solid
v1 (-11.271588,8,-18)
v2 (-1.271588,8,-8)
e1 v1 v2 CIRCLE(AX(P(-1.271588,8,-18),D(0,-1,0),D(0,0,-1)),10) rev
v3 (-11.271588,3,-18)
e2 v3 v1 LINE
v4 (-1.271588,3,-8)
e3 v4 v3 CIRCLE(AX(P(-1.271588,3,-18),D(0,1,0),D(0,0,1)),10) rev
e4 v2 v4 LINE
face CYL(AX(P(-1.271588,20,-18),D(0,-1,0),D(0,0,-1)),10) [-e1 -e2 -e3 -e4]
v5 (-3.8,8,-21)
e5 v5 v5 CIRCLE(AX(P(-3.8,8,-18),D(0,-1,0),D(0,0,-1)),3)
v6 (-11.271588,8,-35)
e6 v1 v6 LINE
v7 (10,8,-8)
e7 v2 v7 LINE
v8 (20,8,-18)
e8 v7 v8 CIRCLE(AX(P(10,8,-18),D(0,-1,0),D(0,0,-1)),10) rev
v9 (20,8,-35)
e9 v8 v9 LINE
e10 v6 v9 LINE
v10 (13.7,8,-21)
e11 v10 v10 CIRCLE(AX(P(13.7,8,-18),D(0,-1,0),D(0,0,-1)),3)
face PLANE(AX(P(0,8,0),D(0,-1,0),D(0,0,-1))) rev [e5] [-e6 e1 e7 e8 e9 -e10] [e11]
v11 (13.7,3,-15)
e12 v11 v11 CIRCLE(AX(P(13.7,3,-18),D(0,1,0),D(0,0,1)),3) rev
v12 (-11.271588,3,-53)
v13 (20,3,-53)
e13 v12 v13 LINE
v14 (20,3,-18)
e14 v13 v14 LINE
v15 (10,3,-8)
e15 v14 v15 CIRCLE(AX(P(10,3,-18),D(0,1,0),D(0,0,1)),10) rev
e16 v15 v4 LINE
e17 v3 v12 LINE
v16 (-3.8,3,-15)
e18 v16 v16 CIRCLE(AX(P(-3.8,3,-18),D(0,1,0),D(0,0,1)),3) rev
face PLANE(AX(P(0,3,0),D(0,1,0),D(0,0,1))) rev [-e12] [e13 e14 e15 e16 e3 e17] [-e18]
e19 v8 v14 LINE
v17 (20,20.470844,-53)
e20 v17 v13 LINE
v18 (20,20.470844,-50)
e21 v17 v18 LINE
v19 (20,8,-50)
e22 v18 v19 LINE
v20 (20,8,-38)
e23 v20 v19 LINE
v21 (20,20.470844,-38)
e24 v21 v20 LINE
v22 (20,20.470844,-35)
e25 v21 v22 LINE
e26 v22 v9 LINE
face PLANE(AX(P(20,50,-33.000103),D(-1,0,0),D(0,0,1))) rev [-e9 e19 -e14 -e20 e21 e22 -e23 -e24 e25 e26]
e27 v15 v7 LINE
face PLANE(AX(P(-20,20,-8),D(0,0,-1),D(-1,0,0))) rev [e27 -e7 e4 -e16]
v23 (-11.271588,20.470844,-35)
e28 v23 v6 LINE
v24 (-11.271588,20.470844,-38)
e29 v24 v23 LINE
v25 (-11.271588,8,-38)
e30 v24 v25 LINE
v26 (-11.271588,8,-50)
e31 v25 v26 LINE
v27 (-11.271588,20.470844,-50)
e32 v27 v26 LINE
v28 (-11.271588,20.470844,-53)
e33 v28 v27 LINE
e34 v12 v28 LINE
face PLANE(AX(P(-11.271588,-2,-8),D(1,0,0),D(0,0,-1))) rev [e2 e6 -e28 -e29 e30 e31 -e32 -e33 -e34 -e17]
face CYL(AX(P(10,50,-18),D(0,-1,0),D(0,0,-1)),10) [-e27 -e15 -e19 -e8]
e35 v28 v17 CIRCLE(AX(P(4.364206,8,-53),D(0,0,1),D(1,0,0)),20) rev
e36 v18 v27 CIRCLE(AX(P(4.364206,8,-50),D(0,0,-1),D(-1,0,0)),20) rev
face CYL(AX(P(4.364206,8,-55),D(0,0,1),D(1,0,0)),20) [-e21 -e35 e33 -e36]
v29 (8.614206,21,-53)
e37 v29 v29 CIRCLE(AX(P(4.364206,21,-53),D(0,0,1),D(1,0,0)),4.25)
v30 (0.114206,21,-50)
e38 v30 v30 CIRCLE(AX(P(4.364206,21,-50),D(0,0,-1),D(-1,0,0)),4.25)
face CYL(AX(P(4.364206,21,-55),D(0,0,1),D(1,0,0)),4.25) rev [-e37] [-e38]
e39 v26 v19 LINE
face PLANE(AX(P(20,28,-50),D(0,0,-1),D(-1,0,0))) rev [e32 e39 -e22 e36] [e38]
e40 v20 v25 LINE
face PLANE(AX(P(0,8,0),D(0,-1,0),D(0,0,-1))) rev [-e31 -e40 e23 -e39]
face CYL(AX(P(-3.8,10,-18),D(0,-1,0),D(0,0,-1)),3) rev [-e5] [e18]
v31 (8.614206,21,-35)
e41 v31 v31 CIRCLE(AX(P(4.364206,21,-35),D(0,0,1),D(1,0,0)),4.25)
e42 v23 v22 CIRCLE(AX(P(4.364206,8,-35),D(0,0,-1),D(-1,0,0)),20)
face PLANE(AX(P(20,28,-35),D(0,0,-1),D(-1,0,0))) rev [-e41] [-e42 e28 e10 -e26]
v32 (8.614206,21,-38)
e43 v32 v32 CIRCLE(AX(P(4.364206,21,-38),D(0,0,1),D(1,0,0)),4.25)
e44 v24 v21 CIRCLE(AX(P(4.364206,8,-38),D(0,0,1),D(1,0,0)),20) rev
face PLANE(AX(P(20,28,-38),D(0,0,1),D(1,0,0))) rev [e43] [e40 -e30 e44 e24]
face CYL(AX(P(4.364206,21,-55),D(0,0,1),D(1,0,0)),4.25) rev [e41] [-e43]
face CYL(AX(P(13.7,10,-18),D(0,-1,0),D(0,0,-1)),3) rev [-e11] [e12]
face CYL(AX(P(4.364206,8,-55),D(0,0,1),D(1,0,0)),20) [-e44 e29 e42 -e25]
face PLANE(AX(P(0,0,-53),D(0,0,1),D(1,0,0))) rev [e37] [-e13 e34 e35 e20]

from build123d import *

# Parameters (mm, degrees)
BOSS_EXTRUDE1_OUTLINE_R     = 3.500000003
BOSS_EXTRUDE1_OUTLINE_R_2   = 3.500000005
BOSS_EXTRUDE1_DEPTH         = 8
BOSS_EXTRUDE1_START         = 8
BOSS_EXTRUDE1_2_DEPTH       = 13
BOSS_EXTRUDE1_START_2       = 20.176470589
BOSS_EXTRUDE1_3_OUTLINE_W   = 15
BOSS_EXTRUDE1_3_OUTLINE_H   = 8
BOSS_EXTRUDE1_3_DEPTH       = 29.823529411
BOSS_EXTRUDE1_4_DEPTH       = 14.823529411
BOSS_EXTRUDE1_5_OUTLINE_R   = 1.75
BOSS_EXTRUDE1_5_OUTLINE_R_2 = 3.500000003
BOSS_EXTRUDE1_5_OUTLINE_R_3 = 1.749999996
BOSS_EXTRUDE1_5_OUTLINE_R_4 = 3.500000005
BOSS_EXTRUDE1_5_OUTLINE_R_5 = 1.749999999
BOSS_EXTRUDE1_5_DEPTH       = 4
BOSS_EXTRUDE1_START_3       = -34
BOSS_EXTRUDE1_6_OUTLINE_R   = 1.749999996
BOSS_EXTRUDE1_6_DEPTH       = 9
BOSS_EXTRUDE1_START_4       = 2.590816236
BOSS_EXTRUDE1_7_DEPTH       = 13.213162803
SKETCH2_W                   = 49.146856184
SKETCH2_H                   = 24.85114674
CUT_EXTRUDE1_DEPTH          = 20
SKETCH4_R                   = 5.607924621
SKETCH4_R_2                 = 5.608756875
BOSS_EXTRUDE2_DEPTH         = 8
SKETCH5_W                   = 3
SKETCH5_H                   = 8
BOSS_EXTRUDE3_DEPTH         = 17
SKETCH6_R                   = 3.5
CUT_EXTRUDE2_DEPTH          = 25
CUT_EXTRUDE3_DEPTH          = 59.429444632
CUT_EXTRUDE3_DEPTH_BACK     = 59.429444632
SKETCH7_W                   = 9.630467125
SKETCH7_H                   = 58.787662196
SKETCH8_W                   = 43
SKETCH8_H                   = 25
BOSS_EXTRUDE4_DEPTH         = 8
SKETCH9_W                   = 43
SKETCH9_H                   = 25
CUT_EXTRUDE6_DEPTH          = 11
SKETCH10_R                  = 3
CUT_EXTRUDE7_DEPTH          = 10
SKETCH11_W                  = 44.092215153
SKETCH11_H                  = 53.727113244
CUT_EXTRUDE8_DEPTH          = 10
SKETCH13_W                  = 11.72841244
SKETCH13_H                  = 25
CUT_EXTRUDE9_DEPTH          = 10
SKETCH14_W                  = 31.27158756
SKETCH14_H                  = 8
BOSS_EXTRUDE5_DEPTH         = 20
SKETCH15_W                  = 31.27158756
SKETCH15_H                  = 3
BOSS_EXTRUDE6_DEPTH         = 20
SKETCH16_R                  = 4.25
CUT_EXTRUDE12_DEPTH         = 20
SKETCH17_W                  = 31.27158756
SKETCH17_H                  = 45
CUT_EXTRUDE13_DEPTH         = 3
FILLET1_R                   = 10


with BuildPart() as part:
    # Boss-Extrude1: read off the stored shape, not the designer's step
    # Boss-Extrude1 outline → Boss-Extrude1 (new body)
    with BuildSketch(Plane(origin=(0, 0, 0), x_dir=(1, 0, 0), z_dir=(0, 1, 0))):
        with BuildLine():
            ThreePointArc((-3.5, -5), (0, -1.5), (3.5, -5))
            Line((3.5, -5), (3.5, -8))
            Line((3.5, -8), (4, -8))
            Line((4, -8), (25, 13.000000001))
            Line((25, 13.000000001), (25, 33))
            Line((25, 33), (-23, 33))
            Line((-23, 33), (-23, 25))
            Line((-23, 25), (-20, 25))
            Line((-20, 25), (-20, 8))
            Line((-20, 8), (-4, -8))
            Line((-4, -8), (-3.5, -8))
            Line((-3.5, -8), (-3.5, -5))
        make_face()
        with Locations((-10, 15)):
            Circle(BOSS_EXTRUDE1_OUTLINE_R, mode=Mode.SUBTRACT)
        with Locations((10, 15)):
            Circle(BOSS_EXTRUDE1_OUTLINE_R_2, mode=Mode.SUBTRACT)
    extrude(amount=BOSS_EXTRUDE1_DEPTH)

    # Boss-Extrude1 2 outline → Boss-Extrude1 2 (add)
    with BuildSketch(Plane(origin=(0, 0, 0), x_dir=(1, 0, 0), z_dir=(0, 1, 0)).offset(BOSS_EXTRUDE1_START)):
        Polygon((20, 25), (20, 8), (25, 13.000000001), (25, 33), (-23, 33), (-23, 25), align=None)
    extrude(amount=BOSS_EXTRUDE1_2_DEPTH)

    # Boss-Extrude1 3 outline → Boss-Extrude1 3 (add)
    with BuildSketch(Plane(origin=(0, 0, 0), x_dir=(1, 0, 0), z_dir=(0, 1, 0)).offset(BOSS_EXTRUDE1_START_2)):
        with Locations((17.5, 29)):
            Rectangle(BOSS_EXTRUDE1_3_OUTLINE_W, BOSS_EXTRUDE1_3_OUTLINE_H)
    extrude(amount=BOSS_EXTRUDE1_3_DEPTH)

    # Boss-Extrude1 4 outline → Boss-Extrude1 4 (add)
    with BuildSketch(Plane(origin=(0, 0, 0), x_dir=(1, 0, 0), z_dir=(0, 1, 0)).offset(BOSS_EXTRUDE1_START_2)):
        Polygon((20, 25), (20, 8), (25, 13.000000001), (25, 25), align=None)
    extrude(amount=BOSS_EXTRUDE1_4_DEPTH)

    # Boss-Extrude1 5 outline → Boss-Extrude1 5 (add)
    # profile 1 of 3: a face of its own
    with BuildSketch(Plane(origin=(0, 0, 0), x_dir=(1, 0, 0), z_dir=(0, 1, 0))):
        with BuildLine():
            Line((3.5, -8), (3.5, -5))
            ThreePointArc((3.5, -5), (0, -1.5), (-3.5, -5))
            Line((-3.5, -5), (-3.5, -8))
            Line((-3.5, -8), (3.5, -8))
        make_face()
        with Locations((0, -5)):
            Circle(BOSS_EXTRUDE1_5_OUTLINE_R, mode=Mode.SUBTRACT)
    # profile 2 of 3: a face of its own
    with BuildSketch(Plane(origin=(0, 0, 0), x_dir=(1, 0, 0), z_dir=(0, 1, 0))):
        with Locations((-10, 15)):
            Circle(BOSS_EXTRUDE1_5_OUTLINE_R_2)
        with Locations((-10, 15)):
            Circle(BOSS_EXTRUDE1_5_OUTLINE_R_3, mode=Mode.SUBTRACT)
    # profile 3 of 3: a face of its own
    with BuildSketch(Plane(origin=(0, 0, 0), x_dir=(1, 0, 0), z_dir=(0, 1, 0))):
        with Locations((10, 15)):
            Circle(BOSS_EXTRUDE1_5_OUTLINE_R_4)
        with Locations((10, 15)):
            Circle(BOSS_EXTRUDE1_5_OUTLINE_R_5, mode=Mode.SUBTRACT)
    extrude(amount=BOSS_EXTRUDE1_5_DEPTH)

    # Boss-Extrude1 6 outline → Boss-Extrude1 6 (cut)
    with BuildSketch(Plane.XY.offset(BOSS_EXTRUDE1_START_3)):
        with BuildLine():
            Line((-20.000000002, 18), (7, 18))
            ThreePointArc((7, 18), (9.121320344, 18.878679656), (10, 21))
            Line((10, 21), (-23, 21))
            Line((-23, 21), (-23, 15.000000003))
            Line((-23, 15.000000003), (-20.000000002, 18))
        make_face()
        Polygon((25, 50), (20, 50), (25, 42), align=None)
        Polygon((10, 50), (10, 46.999999997), (13.000000003, 49.999999997), align=None)
        with Locations((14.5, 13.5)):
            Circle(BOSS_EXTRUDE1_6_OUTLINE_R)
        with Locations((-16.5, 13.5)):
            Circle(BOSS_EXTRUDE1_6_OUTLINE_R)
        with Locations((14.5, 44.5)):
            Circle(BOSS_EXTRUDE1_6_OUTLINE_R)
    extrude(amount=BOSS_EXTRUDE1_6_DEPTH, mode=Mode.SUBTRACT)

    # Boss-Extrude1 7 outline → Boss-Extrude1 7 (cut)
    with BuildSketch(Plane(origin=(0, 0, 0), x_dir=(1, 0, 0), z_dir=(0, 0.6291982286909779, 0.7772448706888557)).offset(BOSS_EXTRUDE1_START_4)):
        Polygon((20, 15.915014019), (25, 23.861635248), (25, 42.933526191), (20, 42.933526191), align=None)
    extrude(amount=BOSS_EXTRUDE1_7_DEPTH, mode=Mode.SUBTRACT)

    # Sketch2 → Cut-Extrude1 (cut)
    with BuildSketch(Plane(origin=(0, 0, 0), x_dir=(-1, 0, 0), z_dir=(0, -1, 0))):
        with Locations((-4.573428092, -4.42557337)):
            Rectangle(SKETCH2_W, SKETCH2_H)
    extrude(amount=-CUT_EXTRUDE1_DEPTH, mode=Mode.SUBTRACT)

    # Sketch4 → Boss-Extrude2 (add, through all)
    with BuildSketch(Plane(origin=(0, 8, 0), x_dir=(1, 0, 0), z_dir=(0, 1, 0))):
        with Locations(Location((-10, 15, 0), (0, 0, 270))):
            Circle(SKETCH4_R)
        with Locations(Location((10, 15, 0), (0, 0, 270))):
            Circle(SKETCH4_R_2)
    extrude(amount=-BOSS_EXTRUDE2_DEPTH)

    # Sketch5 → Boss-Extrude3 (add)
    with BuildSketch(Plane.XY.offset(-25)):
        with Locations((-21.5, 4)):
            Rectangle(SKETCH5_W, SKETCH5_H)
    extrude(amount=BOSS_EXTRUDE3_DEPTH)

    # Sketch6 → Cut-Extrude2 (cut)
    with BuildSketch(Plane(origin=(0, 8, 0), x_dir=(1, 0, 0), z_dir=(0, 1, 0))):
        with Locations(Location((-14.7, 16.3, 0), (0, 0, 270))):
            Circle(SKETCH6_R)
        with Locations(Location((2.8, 16.3, 0), (0, 0, 270))):
            Circle(SKETCH6_R)
    extrude(amount=-CUT_EXTRUDE2_DEPTH, mode=Mode.SUBTRACT)

    # Sketch7 → Cut-Extrude3 (cut, two sides: drawn at the far end of the back side and taken through both)
    with BuildSketch(Plane.XY.offset(-25).offset(-CUT_EXTRUDE3_DEPTH_BACK)):
        with Locations((24.815233563, 20.606168902)):
            Rectangle(SKETCH7_W, SKETCH7_H)
    extrude(amount=CUT_EXTRUDE3_DEPTH + CUT_EXTRUDE3_DEPTH_BACK, mode=Mode.SUBTRACT)

    # Sketch8 → Boss-Extrude4 (add)
    with BuildSketch(Plane(origin=(0, 0, 0), x_dir=(-1, 0, 0), z_dir=(0, -1, 0))):
        with Locations((1.5, 20.5)):
            Rectangle(SKETCH8_W, SKETCH8_H)
    extrude(amount=-BOSS_EXTRUDE4_DEPTH)

    # Sketch9 → Cut-Extrude6 (cut)
    with BuildSketch(Plane(origin=(0, 0, 0), x_dir=(-1, 0, 0), z_dir=(0, -1, 0))):
        with Locations((1.5, 20.5)):
            Rectangle(SKETCH9_W, SKETCH9_H)
    extrude(amount=CUT_EXTRUDE6_DEPTH, mode=Mode.SUBTRACT)

    # Sketch10 → Cut-Extrude7 (cut)
    with BuildSketch(Plane(origin=(0, 0, 0), x_dir=(-1, 0, 0), z_dir=(0, -1, 0))):
        with Locations(Location((-13.7, 18, 0), (0, 0, 90))):
            Circle(SKETCH10_R)
        with Locations(Location((3.8, 18, 0), (0, 0, 90))):
            Circle(SKETCH10_R)
    extrude(amount=-CUT_EXTRUDE7_DEPTH, mode=Mode.SUBTRACT)

    # Sketch11 → Cut-Extrude8 (cut)
    with BuildSketch(Plane.XY.offset(-25)):
        with Locations((-2.046107577, 34.863556622)):
            Rectangle(SKETCH11_W, SKETCH11_H)
    extrude(amount=-CUT_EXTRUDE8_DEPTH, mode=Mode.SUBTRACT)

    # Sketch13 → Cut-Extrude9 (cut)
    with BuildSketch(Plane(origin=(0, 8, 0), x_dir=(1, 0, 0), z_dir=(0, 1, 0))):
        with Locations((-17.13579378, 20.5)):
            Rectangle(SKETCH13_W, SKETCH13_H)
    extrude(amount=-CUT_EXTRUDE9_DEPTH, mode=Mode.SUBTRACT)

    # Sketch14 → Boss-Extrude5 (add)
    with BuildSketch(Plane(origin=(0, 0, -33), x_dir=(-1, 0, 0), z_dir=(0, 0, -1))):
        with Locations((-4.36420622, 4)):
            Rectangle(SKETCH14_W, SKETCH14_H)
    extrude(amount=BOSS_EXTRUDE5_DEPTH)

    # Sketch15 → Boss-Extrude6 (add)
    with BuildSketch(Plane(origin=(0, 8, 0), x_dir=(1, 0, 0), z_dir=(0, 1, 0))):
        with Locations((4.36420622, 51.5)):
            Rectangle(SKETCH15_W, SKETCH15_H)
        with Locations((4.36420622, 36.5)):
            Rectangle(SKETCH15_W, SKETCH15_H)
    extrude(amount=BOSS_EXTRUDE6_DEPTH)

    # Sketch16 → Cut-Extrude12 (cut)
    with BuildSketch(Plane.XY.offset(-35)):
        with Locations((4.36420622, 21)):
            Circle(SKETCH16_R)
        with BuildLine():
            Line((20, 20.470844112), (31.027362531, 31.498206643))
            Line((31.027362531, 31.498206643), (10.435744992, 49.378328991))
            Line((10.435744992, 49.378328991), (-8.588152436, 51.031027656))
            Line((-8.588152436, 51.031027656), (-22.41621992, 31.498206643))
            Line((-22.41621992, 31.498206643), (-11.27158756, 20.470844112))
            ThreePointArc((-11.27158756, 20.470844112), (-4.31286465, 26.019668175), (4.36420622, 28))
            ThreePointArc((4.36420622, 28), (13.04127709, 26.019668175), (20, 20.470844112))
        make_face()
    extrude(amount=-CUT_EXTRUDE12_DEPTH, mode=Mode.SUBTRACT)

    # Sketch17 → Cut-Extrude13 (cut)
    with BuildSketch(Plane(origin=(0, 0, 0), x_dir=(-1, 0, 0), z_dir=(0, -1, 0))):
        with Locations((-4.36420622, 30.5)):
            Rectangle(SKETCH17_W, SKETCH17_H)
    extrude(amount=-CUT_EXTRUDE13_DEPTH, mode=Mode.SUBTRACT)

    # Fillet1
    fillet1_edges = [part.edges().sort_by_distance(p)[0] for p in [
        (-11.27158756, 5.5, -8),
        (19.999999999, 5.5, -8),
    ]]
    fillet(fillet1_edges, radius=FILLET1_R)


solid = part.part
